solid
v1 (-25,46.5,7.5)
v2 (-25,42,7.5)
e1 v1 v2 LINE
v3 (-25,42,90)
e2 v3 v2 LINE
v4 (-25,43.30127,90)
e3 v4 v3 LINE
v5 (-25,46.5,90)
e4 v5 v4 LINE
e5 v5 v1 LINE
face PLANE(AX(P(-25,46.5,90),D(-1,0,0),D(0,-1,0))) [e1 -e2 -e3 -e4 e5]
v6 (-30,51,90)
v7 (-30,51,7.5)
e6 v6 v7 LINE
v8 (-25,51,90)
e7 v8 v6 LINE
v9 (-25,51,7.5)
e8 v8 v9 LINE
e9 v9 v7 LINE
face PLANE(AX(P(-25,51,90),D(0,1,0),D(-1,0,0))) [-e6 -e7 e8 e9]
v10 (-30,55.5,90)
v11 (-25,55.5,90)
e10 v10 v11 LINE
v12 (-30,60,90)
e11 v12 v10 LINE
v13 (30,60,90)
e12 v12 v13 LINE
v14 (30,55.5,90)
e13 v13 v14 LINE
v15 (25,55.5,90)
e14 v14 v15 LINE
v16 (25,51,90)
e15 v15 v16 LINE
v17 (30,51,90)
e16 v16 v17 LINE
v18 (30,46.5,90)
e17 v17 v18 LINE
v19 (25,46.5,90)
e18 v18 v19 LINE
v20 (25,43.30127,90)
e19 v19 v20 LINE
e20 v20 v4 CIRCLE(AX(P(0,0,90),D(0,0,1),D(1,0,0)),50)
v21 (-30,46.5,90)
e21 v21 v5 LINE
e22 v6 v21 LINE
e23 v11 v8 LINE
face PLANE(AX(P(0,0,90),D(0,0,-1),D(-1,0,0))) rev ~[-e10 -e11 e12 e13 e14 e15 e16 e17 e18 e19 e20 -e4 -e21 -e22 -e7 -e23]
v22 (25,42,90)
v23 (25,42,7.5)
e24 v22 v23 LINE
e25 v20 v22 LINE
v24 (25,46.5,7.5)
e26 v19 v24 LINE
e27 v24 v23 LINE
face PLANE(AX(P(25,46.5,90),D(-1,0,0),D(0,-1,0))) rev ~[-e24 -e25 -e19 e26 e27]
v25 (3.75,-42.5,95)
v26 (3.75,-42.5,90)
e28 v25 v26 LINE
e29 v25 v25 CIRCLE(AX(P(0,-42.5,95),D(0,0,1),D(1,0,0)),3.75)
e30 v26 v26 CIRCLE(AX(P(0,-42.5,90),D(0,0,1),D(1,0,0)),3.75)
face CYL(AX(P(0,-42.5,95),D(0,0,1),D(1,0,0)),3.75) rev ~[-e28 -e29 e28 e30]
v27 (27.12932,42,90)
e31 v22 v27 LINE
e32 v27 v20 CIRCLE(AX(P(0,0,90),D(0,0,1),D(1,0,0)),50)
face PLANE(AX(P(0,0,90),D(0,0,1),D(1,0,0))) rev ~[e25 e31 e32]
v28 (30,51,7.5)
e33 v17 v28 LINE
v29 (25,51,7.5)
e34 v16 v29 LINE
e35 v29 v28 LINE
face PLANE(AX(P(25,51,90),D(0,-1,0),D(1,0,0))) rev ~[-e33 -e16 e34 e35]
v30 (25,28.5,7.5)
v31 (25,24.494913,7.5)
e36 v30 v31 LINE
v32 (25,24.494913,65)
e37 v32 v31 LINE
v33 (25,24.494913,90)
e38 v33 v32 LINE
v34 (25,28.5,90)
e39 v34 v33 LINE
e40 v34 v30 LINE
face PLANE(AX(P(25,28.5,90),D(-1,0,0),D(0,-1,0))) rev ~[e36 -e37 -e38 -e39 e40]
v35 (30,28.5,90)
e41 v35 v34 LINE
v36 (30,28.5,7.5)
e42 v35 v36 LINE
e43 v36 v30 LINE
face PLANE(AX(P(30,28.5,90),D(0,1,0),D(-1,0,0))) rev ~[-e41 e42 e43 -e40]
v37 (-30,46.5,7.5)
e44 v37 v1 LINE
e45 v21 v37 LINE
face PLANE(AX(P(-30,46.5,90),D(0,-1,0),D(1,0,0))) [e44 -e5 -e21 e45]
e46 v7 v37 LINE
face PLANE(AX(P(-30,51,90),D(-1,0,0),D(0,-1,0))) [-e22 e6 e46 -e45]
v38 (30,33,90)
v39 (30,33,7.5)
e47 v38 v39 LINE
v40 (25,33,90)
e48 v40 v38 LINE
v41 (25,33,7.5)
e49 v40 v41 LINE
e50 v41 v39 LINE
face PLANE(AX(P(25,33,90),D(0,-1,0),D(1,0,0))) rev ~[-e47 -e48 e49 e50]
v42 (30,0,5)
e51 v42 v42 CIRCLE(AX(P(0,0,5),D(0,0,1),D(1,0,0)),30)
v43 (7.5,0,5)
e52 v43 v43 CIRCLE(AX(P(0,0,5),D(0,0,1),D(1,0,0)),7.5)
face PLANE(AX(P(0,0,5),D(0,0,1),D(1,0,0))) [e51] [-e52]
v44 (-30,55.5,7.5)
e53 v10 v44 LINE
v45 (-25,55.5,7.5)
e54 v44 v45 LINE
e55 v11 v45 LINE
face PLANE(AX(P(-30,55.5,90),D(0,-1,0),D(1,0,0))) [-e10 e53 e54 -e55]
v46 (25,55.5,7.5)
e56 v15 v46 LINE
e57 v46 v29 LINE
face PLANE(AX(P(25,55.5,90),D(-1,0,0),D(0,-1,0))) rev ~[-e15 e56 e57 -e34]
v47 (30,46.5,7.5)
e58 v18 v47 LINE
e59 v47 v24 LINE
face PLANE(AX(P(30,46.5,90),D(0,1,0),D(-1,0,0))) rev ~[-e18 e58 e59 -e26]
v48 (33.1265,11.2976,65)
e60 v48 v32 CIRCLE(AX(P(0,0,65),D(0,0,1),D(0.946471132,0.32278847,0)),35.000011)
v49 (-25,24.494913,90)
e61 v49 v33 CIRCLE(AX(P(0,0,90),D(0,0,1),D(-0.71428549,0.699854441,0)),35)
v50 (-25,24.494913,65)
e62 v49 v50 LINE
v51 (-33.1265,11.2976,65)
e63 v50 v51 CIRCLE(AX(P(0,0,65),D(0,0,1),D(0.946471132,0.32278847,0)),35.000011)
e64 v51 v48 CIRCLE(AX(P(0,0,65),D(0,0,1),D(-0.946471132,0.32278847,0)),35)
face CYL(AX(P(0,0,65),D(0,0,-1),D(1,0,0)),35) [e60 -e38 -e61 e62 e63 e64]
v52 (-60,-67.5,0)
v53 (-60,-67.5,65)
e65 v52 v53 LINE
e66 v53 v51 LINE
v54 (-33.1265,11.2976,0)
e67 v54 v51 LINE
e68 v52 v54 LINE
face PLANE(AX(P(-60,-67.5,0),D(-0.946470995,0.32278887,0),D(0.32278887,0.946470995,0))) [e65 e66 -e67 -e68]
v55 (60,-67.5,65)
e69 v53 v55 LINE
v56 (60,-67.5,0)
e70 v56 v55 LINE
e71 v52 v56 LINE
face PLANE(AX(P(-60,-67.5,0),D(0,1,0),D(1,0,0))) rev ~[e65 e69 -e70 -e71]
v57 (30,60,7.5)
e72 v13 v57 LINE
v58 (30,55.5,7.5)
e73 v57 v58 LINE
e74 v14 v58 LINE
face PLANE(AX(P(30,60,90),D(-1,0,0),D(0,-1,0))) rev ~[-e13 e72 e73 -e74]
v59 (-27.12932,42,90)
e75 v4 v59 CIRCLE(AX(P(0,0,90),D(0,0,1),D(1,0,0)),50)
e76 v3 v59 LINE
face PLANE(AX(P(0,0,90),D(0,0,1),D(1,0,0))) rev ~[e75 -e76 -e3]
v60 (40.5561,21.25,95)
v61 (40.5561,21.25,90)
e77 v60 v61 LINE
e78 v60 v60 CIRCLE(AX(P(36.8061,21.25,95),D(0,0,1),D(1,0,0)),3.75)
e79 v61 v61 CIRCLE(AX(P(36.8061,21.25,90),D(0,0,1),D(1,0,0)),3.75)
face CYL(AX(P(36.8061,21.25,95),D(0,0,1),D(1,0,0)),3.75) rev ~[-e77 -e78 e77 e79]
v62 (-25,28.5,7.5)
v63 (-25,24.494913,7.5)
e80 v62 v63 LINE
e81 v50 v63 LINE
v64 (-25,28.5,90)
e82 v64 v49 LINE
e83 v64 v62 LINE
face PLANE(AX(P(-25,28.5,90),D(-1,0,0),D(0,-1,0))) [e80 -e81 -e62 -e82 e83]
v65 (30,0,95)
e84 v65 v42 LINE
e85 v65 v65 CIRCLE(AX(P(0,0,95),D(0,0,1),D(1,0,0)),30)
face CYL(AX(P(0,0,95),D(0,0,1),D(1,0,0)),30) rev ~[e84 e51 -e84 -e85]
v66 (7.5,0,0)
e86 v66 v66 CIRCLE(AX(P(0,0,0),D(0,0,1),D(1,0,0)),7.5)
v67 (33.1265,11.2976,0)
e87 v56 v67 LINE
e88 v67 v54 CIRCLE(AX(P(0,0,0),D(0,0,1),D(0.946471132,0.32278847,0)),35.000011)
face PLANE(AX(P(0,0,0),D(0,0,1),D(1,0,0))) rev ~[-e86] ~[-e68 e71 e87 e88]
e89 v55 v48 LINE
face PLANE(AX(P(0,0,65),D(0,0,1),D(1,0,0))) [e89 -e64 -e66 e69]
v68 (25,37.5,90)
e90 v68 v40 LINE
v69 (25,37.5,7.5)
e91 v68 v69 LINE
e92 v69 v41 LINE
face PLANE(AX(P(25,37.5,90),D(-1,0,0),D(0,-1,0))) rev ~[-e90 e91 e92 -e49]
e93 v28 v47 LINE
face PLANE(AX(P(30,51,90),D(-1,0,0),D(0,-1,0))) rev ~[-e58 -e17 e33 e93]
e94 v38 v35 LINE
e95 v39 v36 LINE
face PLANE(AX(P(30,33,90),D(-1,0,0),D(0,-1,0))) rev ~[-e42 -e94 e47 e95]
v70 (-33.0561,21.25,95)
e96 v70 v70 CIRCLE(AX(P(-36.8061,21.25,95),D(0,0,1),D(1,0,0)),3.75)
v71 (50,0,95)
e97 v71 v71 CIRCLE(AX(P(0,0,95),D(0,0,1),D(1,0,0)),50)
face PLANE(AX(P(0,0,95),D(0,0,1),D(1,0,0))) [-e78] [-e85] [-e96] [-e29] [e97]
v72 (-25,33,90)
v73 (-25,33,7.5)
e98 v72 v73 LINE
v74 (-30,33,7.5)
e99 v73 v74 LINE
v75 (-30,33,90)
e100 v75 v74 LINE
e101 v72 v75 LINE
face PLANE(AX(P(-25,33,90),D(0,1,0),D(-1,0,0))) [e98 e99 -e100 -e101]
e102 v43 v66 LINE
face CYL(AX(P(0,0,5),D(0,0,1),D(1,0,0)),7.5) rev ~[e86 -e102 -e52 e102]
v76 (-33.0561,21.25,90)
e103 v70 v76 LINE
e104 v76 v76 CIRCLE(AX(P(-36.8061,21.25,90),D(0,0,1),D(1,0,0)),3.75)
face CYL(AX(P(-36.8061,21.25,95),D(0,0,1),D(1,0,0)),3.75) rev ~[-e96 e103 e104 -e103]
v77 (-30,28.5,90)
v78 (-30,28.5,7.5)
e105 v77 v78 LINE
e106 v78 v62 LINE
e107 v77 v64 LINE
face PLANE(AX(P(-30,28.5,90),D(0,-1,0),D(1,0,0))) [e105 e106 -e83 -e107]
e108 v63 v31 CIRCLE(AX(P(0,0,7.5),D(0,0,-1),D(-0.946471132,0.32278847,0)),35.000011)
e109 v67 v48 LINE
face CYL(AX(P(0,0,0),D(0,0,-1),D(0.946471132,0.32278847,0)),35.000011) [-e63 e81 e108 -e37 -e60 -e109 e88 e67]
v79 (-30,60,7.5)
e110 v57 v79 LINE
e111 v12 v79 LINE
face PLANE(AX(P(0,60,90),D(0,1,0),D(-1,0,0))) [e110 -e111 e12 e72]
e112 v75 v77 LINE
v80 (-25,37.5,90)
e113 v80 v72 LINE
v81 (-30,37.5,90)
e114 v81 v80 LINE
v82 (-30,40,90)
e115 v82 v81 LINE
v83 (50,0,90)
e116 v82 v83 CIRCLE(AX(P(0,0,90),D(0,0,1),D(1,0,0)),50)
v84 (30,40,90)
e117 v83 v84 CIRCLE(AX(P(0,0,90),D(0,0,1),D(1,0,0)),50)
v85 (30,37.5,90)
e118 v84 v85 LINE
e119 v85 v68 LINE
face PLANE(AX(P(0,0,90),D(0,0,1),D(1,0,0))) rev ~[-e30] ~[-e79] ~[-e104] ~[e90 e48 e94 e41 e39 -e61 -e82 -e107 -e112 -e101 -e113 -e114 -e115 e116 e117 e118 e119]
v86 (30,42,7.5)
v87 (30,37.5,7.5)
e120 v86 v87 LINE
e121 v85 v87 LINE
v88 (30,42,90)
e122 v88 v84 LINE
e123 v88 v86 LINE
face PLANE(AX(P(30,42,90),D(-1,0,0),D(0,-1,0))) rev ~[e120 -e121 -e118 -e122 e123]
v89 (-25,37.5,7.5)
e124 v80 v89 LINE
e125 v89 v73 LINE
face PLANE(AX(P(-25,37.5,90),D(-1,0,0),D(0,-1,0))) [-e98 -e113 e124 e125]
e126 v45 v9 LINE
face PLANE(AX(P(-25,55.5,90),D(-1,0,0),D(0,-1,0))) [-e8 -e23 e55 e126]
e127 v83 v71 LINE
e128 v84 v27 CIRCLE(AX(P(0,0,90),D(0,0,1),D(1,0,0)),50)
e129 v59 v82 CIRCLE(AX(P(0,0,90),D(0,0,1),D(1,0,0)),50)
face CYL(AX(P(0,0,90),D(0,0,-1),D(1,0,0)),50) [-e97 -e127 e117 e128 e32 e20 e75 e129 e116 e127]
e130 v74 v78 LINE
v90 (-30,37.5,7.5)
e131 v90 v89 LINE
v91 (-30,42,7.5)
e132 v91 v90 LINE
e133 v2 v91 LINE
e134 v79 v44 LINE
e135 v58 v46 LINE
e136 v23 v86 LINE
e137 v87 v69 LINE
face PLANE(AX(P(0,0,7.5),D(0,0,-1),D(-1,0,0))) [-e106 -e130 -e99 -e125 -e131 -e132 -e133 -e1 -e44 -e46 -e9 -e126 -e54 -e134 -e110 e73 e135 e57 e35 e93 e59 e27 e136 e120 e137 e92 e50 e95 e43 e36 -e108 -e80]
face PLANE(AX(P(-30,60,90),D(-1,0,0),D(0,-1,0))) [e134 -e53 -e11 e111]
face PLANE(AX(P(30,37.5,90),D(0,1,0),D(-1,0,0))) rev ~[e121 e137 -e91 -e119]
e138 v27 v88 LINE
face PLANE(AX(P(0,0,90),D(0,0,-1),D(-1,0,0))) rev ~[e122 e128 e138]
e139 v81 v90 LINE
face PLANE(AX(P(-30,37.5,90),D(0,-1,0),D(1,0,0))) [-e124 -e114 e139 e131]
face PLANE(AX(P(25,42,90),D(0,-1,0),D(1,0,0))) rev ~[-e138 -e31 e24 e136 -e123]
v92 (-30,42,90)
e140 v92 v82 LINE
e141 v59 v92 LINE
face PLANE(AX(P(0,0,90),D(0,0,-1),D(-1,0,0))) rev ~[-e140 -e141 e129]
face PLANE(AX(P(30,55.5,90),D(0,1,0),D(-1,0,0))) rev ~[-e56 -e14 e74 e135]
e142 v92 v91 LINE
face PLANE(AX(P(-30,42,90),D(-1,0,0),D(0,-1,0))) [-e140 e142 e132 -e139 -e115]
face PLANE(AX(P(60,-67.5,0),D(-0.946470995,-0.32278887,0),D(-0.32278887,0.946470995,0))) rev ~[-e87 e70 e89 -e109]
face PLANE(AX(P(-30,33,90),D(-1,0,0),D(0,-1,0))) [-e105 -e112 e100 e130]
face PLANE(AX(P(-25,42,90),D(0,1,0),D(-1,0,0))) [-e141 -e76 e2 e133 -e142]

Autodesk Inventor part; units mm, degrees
ref_plane "YZ Plane" through (0, 0, 0) normal (1, 0, 0) x (0, 1, 0)
ref_plane "XZ Plane" through (0, 0, 0) normal (0, 1, 0) x (-1, 0, 0)
ref_plane "XY Plane" through (0, 0, 0) normal (0, 0, 1) x (1, 0, 0)
sketch "Sketch1" plane through (0, 0, 0) normal (0, 0, 1) x (1, 0, 0)
  arc A0 (33.1265, 11.2976) -> (-33.1265, 11.2976) centre (0, 0) ccw
  line L0 (-60, -67.5) -> (60, -67.5)
  line L1 (-60, -67.5) -> (-33.1265, 11.2976)
  line L2 (60, -67.5) -> (33.1265, 11.2976)
  point P0 (0, -67.5)
  dimension "d0" = 70
  dimension "d1" = 120
  dimension "d2" = 60
  dimension "d3" = 67.5
extrude "Extrusion1" add sketch "Sketch1" along normal blind 65
sketch "Sketch2" plane through (0, 0, 65) normal (0, 0, 1) x (1, 0, 0)
  circle A0 centre (0, 0) radius 35
  dimension "d6" = 70
extrude "Extrusion2" add sketch "Sketch2" along normal blind 25
sketch "Sketch3" plane through (0, 0, 90) normal (0, 0, 1) x (1, 0, 0)
  circle A0 centre (0, 0) radius 50
  dimension "d9" = 100
extrude "Extrusion3" add sketch "Sketch3" along normal blind 5
sketch "Sketch4" plane through (0, 0, 95) normal (0, 0, 1) x (1, 0, 0)
  circle A0 centre (0, -42.5) radius 3.75
  circle A1 centre (36.8061, 21.25) radius 3.75
  circle A2 centre (-36.8061, 21.25) radius 3.75
  point P0 (0, 0)
  dimension "d12" = 7.5
  dimension "d13" = 42.5
  dimension "d16" = 360
extrude "Extrusion4" cut sketch "Sketch4" against normal blind 5
sketch "Sketch5" plane through (0, 0, 90) normal (0, 0, -1) x (-1, 0, 0)
  line L0 (0, 60) -> (-30, 60)
  line L1 (-30, 60) -> (-30, 55.5)
  line L2 (-30, 55.5) -> (-25, 55.5)
  line L3 (-25, 55.5) -> (-25, 51)
  line L4 (-25, 51) -> (-30, 51)
  line L5 (-30, 51) -> (-30, 46.5)
  line L6 (-30, 46.5) -> (-25, 46.5)
  line L7 (-25, 46.5) -> (-25, 42)
  line L8 (-25, 42) -> (-30, 42)
  line L9 (-30, 42) -> (-30, 37.5)
  line L10 (-30, 37.5) -> (-25, 37.5)
  line L11 (-25, 37.5) -> (-25, 33)
  line L12 (-25, 33) -> (-30, 33)
  line L13 (-30, 33) -> (-30, 28.5)
  line L14 (-30, 28.5) -> (-25, 28.5)
  line L15 (-25, 28.5) -> (-25, 24)
  line L16 (-25, 24) -> (-30, 24)
  line L17 (-30, 24) -> (-30, 19.5)
  line L18 (-30, 19.5) -> (-25, 19.5)
  arc A0 (33.1265, 11.2976) -> (-33.1265, 11.2976) centre (0, 0) ccw projected
  line L19 (-25, 19.5) -> (0, 19.5)
  line L20 (0, 60) -> (30, 60)
  line L21 (30, 60) -> (30, 55.5)
  line L22 (30, 55.5) -> (25, 55.5)
  line L23 (25, 55.5) -> (25, 51)
  line L24 (25, 51) -> (30, 51)
  line L25 (30, 51) -> (30, 46.5)
  line L26 (30, 46.5) -> (25, 46.5)
  line L27 (25, 46.5) -> (25, 42)
  line L28 (25, 42) -> (30, 42)
  line L29 (30, 42) -> (30, 37.5)
  line L30 (30, 37.5) -> (25, 37.5)
  line L31 (25, 37.5) -> (25, 33)
  line L32 (25, 33) -> (30, 33)
  line L33 (30, 33) -> (30, 28.5)
  line L34 (30, 28.5) -> (25, 28.5)
  line L35 (25, 28.5) -> (25, 24)
  line L36 (25, 24) -> (30, 24)
  line L37 (30, 24) -> (30, 19.5)
  line L38 (30, 19.5) -> (25, 19.5)
  line L39 (25, 19.5) -> (0, 19.5)
  point P0 (0, 35)
  point P1 (-25, 24.4949)
  point P2 (25, 24.4949)
  dimension "d20" = 4.5
  dimension "d21" = 4.5
  dimension "d22" = 4.5
  dimension "d23" = 4.5
  dimension "d24" = 4.5
  dimension "d25" = 4.5
  dimension "d26" = 4.5
  dimension "d27" = 4.5
  dimension "d29" = 5
  dimension "d30" = 5
  dimension "d31" = 4.5
  dimension "d32" = 30
  dimension "d34" = 60
extrude "Extrusion5" add sketch "Sketch5" along normal blind 82.5 contours L20 L21 L22 L23 L24 L25 L26 L27 L28 L29 L30 L31 L32 L33 L34 L35 A0 L15 L14 L13 L12 L11 L10 L9 L8 L7 L6 L5 L4 L3 L2 L1 L0
sketch "Sketch6" plane through (0, 0, 95) normal (0, 0, 1) x (1, 0, 0)
  circle A0 centre (0, 0) radius 30
  dimension "d38" = 60
extrude "Extrusion6" cut sketch "Sketch6" against normal blind 90
sketch "Sketch7" plane through (0, 0, 5) normal (0, 0, 1) x (1, 0, 0)
  circle A0 centre (0, 0) radius 7.5
  dimension "d41" = 15
extrude "Extrusion7" cut sketch "Sketch7" against normal blind 90
properties part number "Base do Motor Industrial" material "Steel, Carbon"
